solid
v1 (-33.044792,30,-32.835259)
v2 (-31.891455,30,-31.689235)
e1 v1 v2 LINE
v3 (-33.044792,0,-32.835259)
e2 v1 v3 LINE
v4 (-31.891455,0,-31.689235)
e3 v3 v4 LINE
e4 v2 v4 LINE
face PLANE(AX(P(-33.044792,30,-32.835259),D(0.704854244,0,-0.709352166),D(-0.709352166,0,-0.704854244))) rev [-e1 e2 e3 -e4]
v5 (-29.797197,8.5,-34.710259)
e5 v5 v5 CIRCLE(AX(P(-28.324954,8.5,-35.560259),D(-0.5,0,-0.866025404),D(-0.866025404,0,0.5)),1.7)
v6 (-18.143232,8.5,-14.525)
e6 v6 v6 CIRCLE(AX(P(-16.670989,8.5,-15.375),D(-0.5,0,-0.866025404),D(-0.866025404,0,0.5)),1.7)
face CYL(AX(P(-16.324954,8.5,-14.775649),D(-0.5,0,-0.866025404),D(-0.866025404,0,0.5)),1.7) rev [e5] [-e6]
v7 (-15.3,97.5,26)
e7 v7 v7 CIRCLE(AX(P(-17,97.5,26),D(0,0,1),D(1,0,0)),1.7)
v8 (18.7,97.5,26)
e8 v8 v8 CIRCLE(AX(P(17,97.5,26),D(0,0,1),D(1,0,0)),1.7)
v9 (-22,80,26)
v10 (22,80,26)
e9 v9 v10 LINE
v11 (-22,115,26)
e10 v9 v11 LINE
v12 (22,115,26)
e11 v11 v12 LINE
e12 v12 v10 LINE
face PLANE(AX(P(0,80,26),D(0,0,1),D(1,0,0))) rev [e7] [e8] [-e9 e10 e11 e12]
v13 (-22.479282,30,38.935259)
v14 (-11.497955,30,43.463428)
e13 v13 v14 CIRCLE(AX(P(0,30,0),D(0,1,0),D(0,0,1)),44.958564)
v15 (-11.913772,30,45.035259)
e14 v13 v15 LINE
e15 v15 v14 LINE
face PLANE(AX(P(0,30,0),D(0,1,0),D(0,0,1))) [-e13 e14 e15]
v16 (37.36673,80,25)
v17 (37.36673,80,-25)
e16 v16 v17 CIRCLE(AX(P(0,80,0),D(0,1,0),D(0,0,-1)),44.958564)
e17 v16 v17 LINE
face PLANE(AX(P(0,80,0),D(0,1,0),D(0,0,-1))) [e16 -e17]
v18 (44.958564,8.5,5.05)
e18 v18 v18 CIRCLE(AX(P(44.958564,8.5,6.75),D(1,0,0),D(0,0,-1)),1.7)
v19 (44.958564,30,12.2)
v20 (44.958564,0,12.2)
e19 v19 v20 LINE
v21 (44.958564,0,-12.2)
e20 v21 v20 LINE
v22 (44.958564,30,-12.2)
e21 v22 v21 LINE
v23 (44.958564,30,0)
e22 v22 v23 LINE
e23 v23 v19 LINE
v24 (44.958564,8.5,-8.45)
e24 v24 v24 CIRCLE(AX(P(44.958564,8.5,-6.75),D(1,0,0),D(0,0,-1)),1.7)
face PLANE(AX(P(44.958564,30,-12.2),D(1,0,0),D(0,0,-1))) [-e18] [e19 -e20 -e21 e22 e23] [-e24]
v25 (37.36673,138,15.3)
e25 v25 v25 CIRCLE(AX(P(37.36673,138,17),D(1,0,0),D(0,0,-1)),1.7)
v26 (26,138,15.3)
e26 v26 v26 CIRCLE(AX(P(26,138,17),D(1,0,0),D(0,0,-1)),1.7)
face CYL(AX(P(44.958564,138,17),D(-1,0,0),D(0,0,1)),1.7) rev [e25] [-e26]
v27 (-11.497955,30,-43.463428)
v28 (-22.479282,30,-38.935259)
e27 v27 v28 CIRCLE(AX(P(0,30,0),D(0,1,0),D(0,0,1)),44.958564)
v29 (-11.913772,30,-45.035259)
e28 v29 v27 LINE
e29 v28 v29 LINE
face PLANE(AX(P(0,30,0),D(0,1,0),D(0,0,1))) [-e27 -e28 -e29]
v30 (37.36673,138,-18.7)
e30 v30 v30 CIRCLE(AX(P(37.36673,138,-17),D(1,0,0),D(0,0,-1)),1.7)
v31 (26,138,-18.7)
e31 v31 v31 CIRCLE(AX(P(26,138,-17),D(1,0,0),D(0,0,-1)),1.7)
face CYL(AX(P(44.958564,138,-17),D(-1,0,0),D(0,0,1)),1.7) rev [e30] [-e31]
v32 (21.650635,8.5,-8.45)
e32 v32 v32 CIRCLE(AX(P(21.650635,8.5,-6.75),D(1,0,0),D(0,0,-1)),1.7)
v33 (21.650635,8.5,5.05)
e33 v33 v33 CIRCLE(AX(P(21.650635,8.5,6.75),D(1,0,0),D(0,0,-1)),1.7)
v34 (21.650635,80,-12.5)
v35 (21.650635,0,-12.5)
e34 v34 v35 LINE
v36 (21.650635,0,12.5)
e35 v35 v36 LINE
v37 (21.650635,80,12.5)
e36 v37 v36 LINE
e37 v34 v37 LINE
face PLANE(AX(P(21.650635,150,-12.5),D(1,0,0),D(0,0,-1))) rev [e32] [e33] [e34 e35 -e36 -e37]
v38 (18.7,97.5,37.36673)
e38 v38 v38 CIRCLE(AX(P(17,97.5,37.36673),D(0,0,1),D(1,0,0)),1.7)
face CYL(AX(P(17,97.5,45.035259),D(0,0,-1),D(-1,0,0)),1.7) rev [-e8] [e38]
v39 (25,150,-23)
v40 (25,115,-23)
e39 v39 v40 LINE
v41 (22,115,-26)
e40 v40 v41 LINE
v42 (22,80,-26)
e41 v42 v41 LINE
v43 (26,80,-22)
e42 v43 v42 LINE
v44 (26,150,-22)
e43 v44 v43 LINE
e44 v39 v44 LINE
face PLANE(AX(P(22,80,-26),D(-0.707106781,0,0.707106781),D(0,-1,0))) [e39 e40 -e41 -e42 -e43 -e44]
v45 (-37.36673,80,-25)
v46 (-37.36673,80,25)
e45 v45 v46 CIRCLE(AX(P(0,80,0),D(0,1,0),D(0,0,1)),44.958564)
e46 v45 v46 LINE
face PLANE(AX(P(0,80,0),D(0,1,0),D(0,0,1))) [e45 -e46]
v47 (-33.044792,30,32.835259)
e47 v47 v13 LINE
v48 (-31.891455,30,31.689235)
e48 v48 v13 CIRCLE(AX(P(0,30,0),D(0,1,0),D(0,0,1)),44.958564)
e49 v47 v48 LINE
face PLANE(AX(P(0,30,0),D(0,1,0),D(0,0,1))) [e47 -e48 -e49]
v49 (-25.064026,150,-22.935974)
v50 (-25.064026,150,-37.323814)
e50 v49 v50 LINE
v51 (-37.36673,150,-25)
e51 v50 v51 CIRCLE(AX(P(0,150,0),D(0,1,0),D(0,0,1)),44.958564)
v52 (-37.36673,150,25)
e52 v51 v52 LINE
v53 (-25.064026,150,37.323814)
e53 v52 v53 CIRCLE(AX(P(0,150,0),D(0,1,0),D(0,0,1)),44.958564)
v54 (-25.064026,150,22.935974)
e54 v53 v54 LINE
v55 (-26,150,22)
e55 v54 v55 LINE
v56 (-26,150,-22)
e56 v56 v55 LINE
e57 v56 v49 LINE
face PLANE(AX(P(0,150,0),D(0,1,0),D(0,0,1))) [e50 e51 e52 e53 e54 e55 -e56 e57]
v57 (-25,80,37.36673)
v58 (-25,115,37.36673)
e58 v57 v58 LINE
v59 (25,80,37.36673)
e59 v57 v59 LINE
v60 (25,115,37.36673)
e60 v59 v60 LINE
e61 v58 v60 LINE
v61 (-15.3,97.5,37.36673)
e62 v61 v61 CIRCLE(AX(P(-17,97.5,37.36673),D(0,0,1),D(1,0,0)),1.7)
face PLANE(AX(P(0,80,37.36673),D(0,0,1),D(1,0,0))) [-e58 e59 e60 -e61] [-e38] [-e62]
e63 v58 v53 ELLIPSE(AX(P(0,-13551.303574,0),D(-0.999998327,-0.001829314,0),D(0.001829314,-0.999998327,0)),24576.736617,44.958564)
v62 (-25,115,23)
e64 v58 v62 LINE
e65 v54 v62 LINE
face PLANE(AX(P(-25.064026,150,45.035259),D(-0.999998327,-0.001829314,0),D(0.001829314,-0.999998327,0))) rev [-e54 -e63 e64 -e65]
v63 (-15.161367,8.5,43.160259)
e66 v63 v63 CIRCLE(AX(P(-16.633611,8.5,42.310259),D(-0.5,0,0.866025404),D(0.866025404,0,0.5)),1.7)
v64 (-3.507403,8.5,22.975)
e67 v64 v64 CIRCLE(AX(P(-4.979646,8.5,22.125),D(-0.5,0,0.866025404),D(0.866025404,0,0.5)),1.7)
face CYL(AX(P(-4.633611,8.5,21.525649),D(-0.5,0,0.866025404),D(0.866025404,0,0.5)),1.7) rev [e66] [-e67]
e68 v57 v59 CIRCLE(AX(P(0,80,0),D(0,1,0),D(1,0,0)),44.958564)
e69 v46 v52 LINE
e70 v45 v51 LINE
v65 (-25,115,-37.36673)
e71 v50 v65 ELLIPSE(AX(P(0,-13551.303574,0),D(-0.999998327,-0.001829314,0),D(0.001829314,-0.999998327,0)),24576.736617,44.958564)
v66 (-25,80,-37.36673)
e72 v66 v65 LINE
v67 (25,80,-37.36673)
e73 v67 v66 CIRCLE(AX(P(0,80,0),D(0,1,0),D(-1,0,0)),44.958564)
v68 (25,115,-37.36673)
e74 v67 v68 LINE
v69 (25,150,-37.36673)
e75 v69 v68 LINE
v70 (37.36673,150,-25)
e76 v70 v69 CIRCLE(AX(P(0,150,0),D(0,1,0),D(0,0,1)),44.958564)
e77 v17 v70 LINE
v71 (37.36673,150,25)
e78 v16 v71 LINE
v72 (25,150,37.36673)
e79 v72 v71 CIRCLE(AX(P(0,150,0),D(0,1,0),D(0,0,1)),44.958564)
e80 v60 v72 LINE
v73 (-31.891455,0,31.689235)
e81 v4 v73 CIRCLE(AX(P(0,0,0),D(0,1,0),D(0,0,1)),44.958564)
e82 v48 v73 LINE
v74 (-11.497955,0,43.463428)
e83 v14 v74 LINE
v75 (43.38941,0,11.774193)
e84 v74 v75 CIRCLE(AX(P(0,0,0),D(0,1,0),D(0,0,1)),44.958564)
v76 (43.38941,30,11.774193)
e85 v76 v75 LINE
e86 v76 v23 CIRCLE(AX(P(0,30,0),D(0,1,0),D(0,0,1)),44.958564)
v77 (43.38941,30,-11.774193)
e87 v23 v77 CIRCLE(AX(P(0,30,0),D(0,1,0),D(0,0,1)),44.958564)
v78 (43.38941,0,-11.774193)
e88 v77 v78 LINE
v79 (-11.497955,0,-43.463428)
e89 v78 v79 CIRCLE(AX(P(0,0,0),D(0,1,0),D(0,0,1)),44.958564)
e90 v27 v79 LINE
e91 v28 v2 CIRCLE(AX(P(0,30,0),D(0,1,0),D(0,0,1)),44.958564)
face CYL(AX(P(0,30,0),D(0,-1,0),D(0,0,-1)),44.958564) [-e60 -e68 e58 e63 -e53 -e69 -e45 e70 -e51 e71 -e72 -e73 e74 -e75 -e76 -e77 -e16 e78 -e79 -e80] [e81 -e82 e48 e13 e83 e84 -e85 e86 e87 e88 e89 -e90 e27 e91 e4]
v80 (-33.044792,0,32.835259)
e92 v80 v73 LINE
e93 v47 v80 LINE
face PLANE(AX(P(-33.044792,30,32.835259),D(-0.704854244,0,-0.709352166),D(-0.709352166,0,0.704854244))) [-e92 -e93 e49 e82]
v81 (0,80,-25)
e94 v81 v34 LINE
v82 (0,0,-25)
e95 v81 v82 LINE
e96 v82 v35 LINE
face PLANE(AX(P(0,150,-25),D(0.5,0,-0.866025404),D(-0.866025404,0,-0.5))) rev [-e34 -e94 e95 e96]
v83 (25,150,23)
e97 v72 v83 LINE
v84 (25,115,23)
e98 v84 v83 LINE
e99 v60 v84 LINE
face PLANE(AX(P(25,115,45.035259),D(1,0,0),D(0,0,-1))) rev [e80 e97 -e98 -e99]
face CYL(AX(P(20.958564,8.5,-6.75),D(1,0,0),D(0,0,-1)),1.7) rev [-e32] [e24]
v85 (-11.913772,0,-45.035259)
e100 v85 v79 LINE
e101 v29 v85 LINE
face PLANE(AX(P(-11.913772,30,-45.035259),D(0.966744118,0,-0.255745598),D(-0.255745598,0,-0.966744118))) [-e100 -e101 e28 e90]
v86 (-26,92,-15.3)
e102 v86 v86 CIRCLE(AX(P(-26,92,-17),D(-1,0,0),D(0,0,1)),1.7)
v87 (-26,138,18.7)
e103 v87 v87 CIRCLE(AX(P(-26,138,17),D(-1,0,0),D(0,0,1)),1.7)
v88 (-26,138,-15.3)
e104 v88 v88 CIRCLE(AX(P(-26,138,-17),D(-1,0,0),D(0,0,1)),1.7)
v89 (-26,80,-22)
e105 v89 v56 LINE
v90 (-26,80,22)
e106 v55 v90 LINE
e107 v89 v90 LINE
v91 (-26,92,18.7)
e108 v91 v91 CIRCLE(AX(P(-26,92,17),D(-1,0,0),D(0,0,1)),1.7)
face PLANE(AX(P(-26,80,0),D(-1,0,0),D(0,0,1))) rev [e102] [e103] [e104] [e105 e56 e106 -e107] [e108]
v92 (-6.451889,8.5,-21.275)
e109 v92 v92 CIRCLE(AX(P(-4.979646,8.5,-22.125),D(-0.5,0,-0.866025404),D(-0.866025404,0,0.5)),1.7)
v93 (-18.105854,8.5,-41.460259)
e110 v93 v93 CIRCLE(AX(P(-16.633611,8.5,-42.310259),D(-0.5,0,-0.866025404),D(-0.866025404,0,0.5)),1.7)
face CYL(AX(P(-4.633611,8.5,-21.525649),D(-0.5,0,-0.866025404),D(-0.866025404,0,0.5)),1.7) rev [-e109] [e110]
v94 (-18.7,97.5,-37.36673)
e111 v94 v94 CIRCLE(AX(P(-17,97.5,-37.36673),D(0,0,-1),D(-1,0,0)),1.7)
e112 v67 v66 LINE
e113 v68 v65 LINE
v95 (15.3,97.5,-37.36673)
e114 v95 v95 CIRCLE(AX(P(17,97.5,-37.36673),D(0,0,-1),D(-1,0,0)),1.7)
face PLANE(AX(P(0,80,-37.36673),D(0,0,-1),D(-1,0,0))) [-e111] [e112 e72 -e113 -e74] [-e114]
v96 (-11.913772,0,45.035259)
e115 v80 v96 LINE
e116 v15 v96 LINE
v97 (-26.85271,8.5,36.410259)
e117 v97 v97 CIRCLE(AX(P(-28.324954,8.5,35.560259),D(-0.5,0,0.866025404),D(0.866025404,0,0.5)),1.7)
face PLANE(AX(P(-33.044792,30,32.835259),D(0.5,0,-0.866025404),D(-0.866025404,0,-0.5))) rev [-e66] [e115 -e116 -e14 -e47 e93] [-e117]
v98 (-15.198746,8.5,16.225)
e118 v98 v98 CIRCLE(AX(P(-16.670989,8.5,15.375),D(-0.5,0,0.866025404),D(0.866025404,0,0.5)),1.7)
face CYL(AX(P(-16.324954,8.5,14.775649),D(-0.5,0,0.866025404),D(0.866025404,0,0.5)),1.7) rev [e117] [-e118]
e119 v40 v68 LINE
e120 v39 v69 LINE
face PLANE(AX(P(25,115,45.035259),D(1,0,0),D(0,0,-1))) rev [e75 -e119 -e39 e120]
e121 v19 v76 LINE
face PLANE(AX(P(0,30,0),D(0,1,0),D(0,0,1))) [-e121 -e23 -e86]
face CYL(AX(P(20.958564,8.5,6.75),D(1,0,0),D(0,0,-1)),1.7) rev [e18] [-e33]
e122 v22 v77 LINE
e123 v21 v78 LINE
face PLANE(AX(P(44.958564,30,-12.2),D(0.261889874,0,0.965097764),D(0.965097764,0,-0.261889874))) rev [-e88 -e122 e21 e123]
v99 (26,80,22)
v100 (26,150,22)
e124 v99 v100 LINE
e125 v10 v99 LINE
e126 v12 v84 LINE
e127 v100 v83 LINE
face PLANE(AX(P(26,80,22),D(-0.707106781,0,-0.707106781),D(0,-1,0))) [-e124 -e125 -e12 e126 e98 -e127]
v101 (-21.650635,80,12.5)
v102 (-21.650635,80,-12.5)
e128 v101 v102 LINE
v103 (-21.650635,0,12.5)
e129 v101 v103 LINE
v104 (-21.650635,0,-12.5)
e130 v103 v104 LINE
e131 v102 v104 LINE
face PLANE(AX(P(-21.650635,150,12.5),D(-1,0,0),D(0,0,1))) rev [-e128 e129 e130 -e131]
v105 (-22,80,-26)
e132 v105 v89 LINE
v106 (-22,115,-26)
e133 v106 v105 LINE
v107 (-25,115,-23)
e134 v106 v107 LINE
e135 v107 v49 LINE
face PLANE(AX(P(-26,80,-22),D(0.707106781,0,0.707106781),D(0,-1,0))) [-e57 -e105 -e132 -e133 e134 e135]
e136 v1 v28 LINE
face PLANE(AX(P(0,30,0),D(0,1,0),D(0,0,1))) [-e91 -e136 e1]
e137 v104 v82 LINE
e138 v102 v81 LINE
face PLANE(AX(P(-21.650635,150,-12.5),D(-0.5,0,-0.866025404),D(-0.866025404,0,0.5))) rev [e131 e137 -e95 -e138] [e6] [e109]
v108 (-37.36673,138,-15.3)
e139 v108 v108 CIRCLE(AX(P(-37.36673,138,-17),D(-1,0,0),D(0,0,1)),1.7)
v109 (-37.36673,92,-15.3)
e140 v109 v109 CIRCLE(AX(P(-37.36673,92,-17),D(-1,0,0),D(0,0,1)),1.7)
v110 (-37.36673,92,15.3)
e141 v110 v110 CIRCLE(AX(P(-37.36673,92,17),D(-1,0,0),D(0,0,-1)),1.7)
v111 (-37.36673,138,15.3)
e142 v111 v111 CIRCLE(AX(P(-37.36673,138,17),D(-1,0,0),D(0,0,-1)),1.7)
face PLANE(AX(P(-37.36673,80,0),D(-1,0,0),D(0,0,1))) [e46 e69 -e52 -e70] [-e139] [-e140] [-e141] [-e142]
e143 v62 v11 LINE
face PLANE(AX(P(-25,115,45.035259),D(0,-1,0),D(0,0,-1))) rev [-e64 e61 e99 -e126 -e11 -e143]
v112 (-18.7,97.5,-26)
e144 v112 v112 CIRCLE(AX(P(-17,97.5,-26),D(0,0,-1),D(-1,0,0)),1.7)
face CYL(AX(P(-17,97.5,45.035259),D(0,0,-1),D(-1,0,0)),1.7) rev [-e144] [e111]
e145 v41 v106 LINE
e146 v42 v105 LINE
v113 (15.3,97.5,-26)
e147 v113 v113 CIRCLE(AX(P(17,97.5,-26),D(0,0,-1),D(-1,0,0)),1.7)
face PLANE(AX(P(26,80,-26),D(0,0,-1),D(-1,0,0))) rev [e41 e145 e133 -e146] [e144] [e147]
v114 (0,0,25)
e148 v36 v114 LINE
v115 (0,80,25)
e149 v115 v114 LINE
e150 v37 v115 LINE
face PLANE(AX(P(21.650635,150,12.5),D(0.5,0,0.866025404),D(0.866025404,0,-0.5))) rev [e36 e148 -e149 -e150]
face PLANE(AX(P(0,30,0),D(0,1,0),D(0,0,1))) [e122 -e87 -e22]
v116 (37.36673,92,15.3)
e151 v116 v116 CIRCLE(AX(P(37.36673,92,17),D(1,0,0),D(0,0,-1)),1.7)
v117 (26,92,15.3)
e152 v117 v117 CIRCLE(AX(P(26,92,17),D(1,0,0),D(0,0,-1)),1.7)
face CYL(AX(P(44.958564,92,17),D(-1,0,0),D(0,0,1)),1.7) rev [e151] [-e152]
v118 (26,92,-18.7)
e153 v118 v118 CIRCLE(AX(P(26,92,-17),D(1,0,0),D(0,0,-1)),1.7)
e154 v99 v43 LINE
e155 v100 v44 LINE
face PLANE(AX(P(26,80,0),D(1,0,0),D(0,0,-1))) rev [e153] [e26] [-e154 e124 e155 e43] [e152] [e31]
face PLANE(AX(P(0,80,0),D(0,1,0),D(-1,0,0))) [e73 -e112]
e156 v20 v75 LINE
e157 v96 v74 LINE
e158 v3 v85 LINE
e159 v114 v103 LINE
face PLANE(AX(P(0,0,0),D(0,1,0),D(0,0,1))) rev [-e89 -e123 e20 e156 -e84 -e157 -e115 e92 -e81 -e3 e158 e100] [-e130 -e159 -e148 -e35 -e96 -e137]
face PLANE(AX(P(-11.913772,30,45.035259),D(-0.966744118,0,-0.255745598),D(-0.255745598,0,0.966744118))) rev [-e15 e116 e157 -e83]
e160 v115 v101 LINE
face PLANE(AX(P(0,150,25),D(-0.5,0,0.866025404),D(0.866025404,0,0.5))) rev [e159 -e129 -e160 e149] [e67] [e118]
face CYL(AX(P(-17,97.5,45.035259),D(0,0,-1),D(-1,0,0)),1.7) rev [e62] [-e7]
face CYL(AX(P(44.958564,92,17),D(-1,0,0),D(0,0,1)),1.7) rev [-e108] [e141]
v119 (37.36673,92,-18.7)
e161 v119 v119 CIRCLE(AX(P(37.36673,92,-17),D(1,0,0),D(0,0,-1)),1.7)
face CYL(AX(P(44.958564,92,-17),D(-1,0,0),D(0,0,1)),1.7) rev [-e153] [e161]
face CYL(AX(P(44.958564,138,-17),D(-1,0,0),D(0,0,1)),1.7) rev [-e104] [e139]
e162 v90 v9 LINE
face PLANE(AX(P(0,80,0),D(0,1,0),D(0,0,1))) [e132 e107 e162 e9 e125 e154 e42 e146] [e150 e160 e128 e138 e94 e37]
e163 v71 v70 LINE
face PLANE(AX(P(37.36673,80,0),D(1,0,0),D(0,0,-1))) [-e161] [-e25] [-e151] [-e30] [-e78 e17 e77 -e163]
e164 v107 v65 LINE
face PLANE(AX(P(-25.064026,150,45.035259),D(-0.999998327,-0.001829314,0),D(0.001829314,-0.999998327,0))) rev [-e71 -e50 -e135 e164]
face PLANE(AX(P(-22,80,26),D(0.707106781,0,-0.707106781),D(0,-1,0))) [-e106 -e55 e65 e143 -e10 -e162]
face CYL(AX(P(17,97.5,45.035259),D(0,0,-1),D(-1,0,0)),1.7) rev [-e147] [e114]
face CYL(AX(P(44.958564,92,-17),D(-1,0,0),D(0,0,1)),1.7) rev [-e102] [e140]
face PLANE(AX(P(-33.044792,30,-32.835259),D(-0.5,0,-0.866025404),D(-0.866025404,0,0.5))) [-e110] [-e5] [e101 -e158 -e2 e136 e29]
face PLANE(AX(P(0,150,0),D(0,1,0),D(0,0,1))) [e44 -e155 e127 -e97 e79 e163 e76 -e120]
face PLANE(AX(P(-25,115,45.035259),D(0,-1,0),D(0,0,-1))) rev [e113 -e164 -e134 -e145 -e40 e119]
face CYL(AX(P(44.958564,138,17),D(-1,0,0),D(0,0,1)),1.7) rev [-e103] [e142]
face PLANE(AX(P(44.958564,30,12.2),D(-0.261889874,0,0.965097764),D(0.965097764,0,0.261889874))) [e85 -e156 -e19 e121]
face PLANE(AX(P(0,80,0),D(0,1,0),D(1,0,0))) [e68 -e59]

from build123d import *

# Parameters (mm, degrees)
BOSS_EXTRUDE1_DEPTH      = 30
SKETCH11_R               = 44.958564256
BOSS_EXTRUDE2_DEPTH      = 120
CUT_EXTRUDE1_DEPTH       = 163.940010531
SKETCH20_R               = 1.7
CUT_EXTRUDE13_DEPTH      = 24
SKETCH22_R               = 1.7
CUT_EXTRUDE14_DEPTH      = 24
SKETCH23_R               = 1.7
CUT_EXTRUDE15_DEPTH      = 24
CUT_EXTRUDE21_START      = -70
CUT_EXTRUDE21_DEPTH      = 70
CUT_EXTRUDE22_DEPTH      = 70
CIRPATTERN1_START        = 80
CIRPATTERN1_DEPTH        = 70
CHAMFER1_SIZE            = 4
SKETCH37_R               = 1.7
CUT_EXTRUDE23_DEPTH      = 177.933966729
CUT_EXTRUDE24_DEPTH      = 177.95016312
CUT_EXTRUDE24_DEPTH_BACK = 177.95016312
CUT_EXTRUDE25_DEPTH      = 177.95016312
CUT_EXTRUDE25_DEPTH_BACK = 177.95016312
SKETCH39_R               = 1.7


# Read off the part's stored shape, not the designer's step: CirPattern1
with BuildPart() as part:
    # Sketch2 → Boss-Extrude1 (new body)
    with BuildSketch(Plane(origin=(0, 0, 0), x_dir=(1, 0, 0), z_dir=(0, 1, 0))):
        with BuildLine():
            Line((-33.044792054, -32.835258764), (-11.913772202, -45.035258764))
            Line((-11.913772202, -45.035258764), (-11.497954912, -43.463427532))
            ThreePointArc((-11.497954912, -43.463427532), (0.991222154, -44.947635963), (13.402827335, -42.914295048))
            ThreePointArc((13.402827335, -42.914295048), (32.384657539, -31.185035772), (43.389409835, -11.77419272))
            Line((43.389409835, -11.77419272), (44.958564256, -12.2))
            Line((44.958564256, -12.2), (44.958564256, 12.2))
            Line((44.958564256, 12.2), (43.389409835, 11.77419272))
            ThreePointArc((43.389409835, 11.77419272), (38.393686215, 23.392249973), (30.359999068, 33.159356999))
            ThreePointArc((30.359999068, 33.159356999), (10.7465178, 43.655295843), (-11.497954912, 43.463427532))
            Line((-11.497954912, 43.463427532), (-11.913772202, 45.035258764))
            Line((-11.913772202, 45.035258764), (-33.044792054, 32.835258764))
            Line((-33.044792054, 32.835258764), (-31.891454922, 31.689234812))
            ThreePointArc((-31.891454922, 31.689234812), (-39.458623491, 21.547378777), (-43.899995544, 9.698602542))
            ThreePointArc((-43.899995544, 9.698602542), (-43.177821403, -12.527898422), (-31.891454922, -31.689234812))
            Line((-31.891454922, -31.689234812), (-33.044792054, -32.835258764))
        make_face()
    extrude(amount=BOSS_EXTRUDE1_DEPTH)

    # Sketch11 → Boss-Extrude2 (add)
    with BuildSketch(Plane(origin=(0, 30, 0), x_dir=(1, 0, 0), z_dir=(0, 1, 0))):
        with Locations(Location((0, 0, 0), (0, 0, 104.817769832))):
            Circle(SKETCH11_R)
    extrude(amount=BOSS_EXTRUDE2_DEPTH)

    # Sketch3 → Cut-Extrude1 (cut, through all)
    with BuildSketch(Plane(origin=(0, 0, 0), x_dir=(-1, 0, 0), z_dir=(0, -1, 0))):
        Polygon((21.650635095, 12.5), (0, 25), (-21.650635095, 12.5), (-21.650635095, -12.5), (0, -25), (21.650635095, -12.5), align=None)
    extrude(amount=-CUT_EXTRUDE1_DEPTH, mode=Mode.SUBTRACT)

    # Sketch20 → Cut-Extrude13 (cut)
    with BuildSketch(Plane(origin=(44.958564256, 0, 0), x_dir=(0, 0, -1), z_dir=(1, 0, 0))):
        with Locations((-6.75, 8.5)):
            Circle(SKETCH20_R)
        with Locations((6.75, 8.5)):
            Circle(SKETCH20_R)
    extrude(amount=-CUT_EXTRUDE13_DEPTH, mode=Mode.SUBTRACT)

    # Sketch22 → Cut-Extrude14 (cut)
    with BuildSketch(Plane(origin=(-22.479282128, 0, -38.935258764), x_dir=(-0.8660254037844386, 0, 0.5000000000000003), z_dir=(-0.5000000000000002, 0, -0.8660254037844385))):
        with Locations((6.75, 8.5)):
            Circle(SKETCH22_R)
        with Locations((-6.75, 8.5)):
            Circle(SKETCH22_R)
    extrude(amount=-CUT_EXTRUDE14_DEPTH, mode=Mode.SUBTRACT)

    # Sketch23 → Cut-Extrude15 (cut)
    with BuildSketch(Plane(origin=(-22.479282128, 0, 38.935258764), x_dir=(0.8660254037844386, 0, 0.5), z_dir=(-0.5000000000000001, 0, 0.8660254037844387))):
        with Locations((-6.75, 8.5)):
            Circle(SKETCH23_R)
        with Locations((6.75, 8.5)):
            Circle(SKETCH23_R)
    extrude(amount=-CUT_EXTRUDE15_DEPTH, mode=Mode.SUBTRACT)

    # Sketch35 → Cut-Extrude21 (cut)
    with BuildSketch(Plane(origin=(0, 150, 0), x_dir=(1, 0, 0), z_dir=(0, 1, 0)).offset(CUT_EXTRUDE21_START)):
        with BuildLine():
            Line((-37.366729854, 25), (-37.366729854, -25))
            ThreePointArc((-37.366729854, -25), (-44.958564256, 0), (-37.366729854, 25))
        make_face()
    extrude(amount=CUT_EXTRUDE21_DEPTH, mode=Mode.SUBTRACT)

    # Sketch36 → Cut-Extrude22 (cut)
    with BuildSketch(Plane(origin=(0, 150, 0), x_dir=(1, 0, 0), z_dir=(0, 1, 0))):
        Polygon((-26, 26), (-26, 0), (-26, -26), (0, -26), (26, -26), (26, 0), (26, 26), (0, 26), align=None)
    extrude(amount=-CUT_EXTRUDE22_DEPTH, mode=Mode.SUBTRACT)

    # CirPattern1 outline → CirPattern1 (cut)
    with BuildSketch(Plane(origin=(0, 0, 0), x_dir=(1, 0, 0), z_dir=(0, 1, 0)).offset(CIRPATTERN1_START)):
        with BuildLine():
            Line((25, -37.366729854), (-25, -37.366729854))
            ThreePointArc((-25, -37.366729854), (0, -44.958564256), (25, -37.366729854))
        make_face()
        with BuildLine():
            ThreePointArc((25, 37.366729854), (0, 44.958564256), (-25, 37.366729854))
            Line((-25, 37.366729854), (25, 37.366729854))
        make_face()
        with BuildLine():
            Line((37.366729854, 25), (37.366729854, -25))
            ThreePointArc((37.366729854, -25), (44.958564256, 0), (37.366729854, 25))
        make_face()
    extrude(amount=CIRPATTERN1_DEPTH, mode=Mode.SUBTRACT)

    # Chamfer1
    chamfer1_edges = [part.edges().sort_by_distance(p)[0] for p in [
        (-26, 115, -26),
        (26, 115, -26),
        (26, 115, 26),
        (-26, 115, 26),
    ]]
    chamfer(chamfer1_edges, length=CHAMFER1_SIZE)

    # Sketch37 → Cut-Extrude23 (cut, through all)
    with BuildSketch(Plane.ZY.offset(37.366729854)):
        with Locations(Location((-17, 138, 0), (0, 0, 180))):
            Circle(SKETCH37_R)
        with Locations(Location((-17, 92, 0), (0, 0, 180))):
            Circle(SKETCH37_R)
        with Locations(Location((17, 92, 0), (0, 0, 180))):
            Circle(SKETCH37_R)
        with Locations(Location((17, 138, 0), (0, 0, 180))):
            Circle(SKETCH37_R)
    extrude(amount=-CUT_EXTRUDE23_DEPTH, mode=Mode.SUBTRACT)

    # Sketch38 → Cut-Extrude24 (cut, two sides: drawn at the far end of the back side and taken through both)
    with BuildSketch(Plane(origin=(0, 0, -37.366729854), x_dir=(-1, 0, 0), z_dir=(0, 0, -1)).offset(-CUT_EXTRUDE24_DEPTH_BACK)):
        Polygon((-25, 150), (25.064026091, 150), (25, 115), (-25, 115), align=None)
    extrude(amount=CUT_EXTRUDE24_DEPTH + CUT_EXTRUDE24_DEPTH_BACK, mode=Mode.SUBTRACT)

    # Sketch39 → Cut-Extrude25 (cut, two sides: drawn at the far end of the back side and taken through both)
    with BuildSketch(Plane(origin=(0, 0, -37.366729854), x_dir=(-1, 0, 0), z_dir=(0, 0, -1)).offset(-CUT_EXTRUDE25_DEPTH_BACK)):
        with Locations((-17, 97.5)):
            Circle(SKETCH39_R)
        with Locations((17, 97.5)):
            Circle(SKETCH39_R)
    extrude(amount=CUT_EXTRUDE25_DEPTH + CUT_EXTRUDE25_DEPTH_BACK, mode=Mode.SUBTRACT)


solid = part.part
